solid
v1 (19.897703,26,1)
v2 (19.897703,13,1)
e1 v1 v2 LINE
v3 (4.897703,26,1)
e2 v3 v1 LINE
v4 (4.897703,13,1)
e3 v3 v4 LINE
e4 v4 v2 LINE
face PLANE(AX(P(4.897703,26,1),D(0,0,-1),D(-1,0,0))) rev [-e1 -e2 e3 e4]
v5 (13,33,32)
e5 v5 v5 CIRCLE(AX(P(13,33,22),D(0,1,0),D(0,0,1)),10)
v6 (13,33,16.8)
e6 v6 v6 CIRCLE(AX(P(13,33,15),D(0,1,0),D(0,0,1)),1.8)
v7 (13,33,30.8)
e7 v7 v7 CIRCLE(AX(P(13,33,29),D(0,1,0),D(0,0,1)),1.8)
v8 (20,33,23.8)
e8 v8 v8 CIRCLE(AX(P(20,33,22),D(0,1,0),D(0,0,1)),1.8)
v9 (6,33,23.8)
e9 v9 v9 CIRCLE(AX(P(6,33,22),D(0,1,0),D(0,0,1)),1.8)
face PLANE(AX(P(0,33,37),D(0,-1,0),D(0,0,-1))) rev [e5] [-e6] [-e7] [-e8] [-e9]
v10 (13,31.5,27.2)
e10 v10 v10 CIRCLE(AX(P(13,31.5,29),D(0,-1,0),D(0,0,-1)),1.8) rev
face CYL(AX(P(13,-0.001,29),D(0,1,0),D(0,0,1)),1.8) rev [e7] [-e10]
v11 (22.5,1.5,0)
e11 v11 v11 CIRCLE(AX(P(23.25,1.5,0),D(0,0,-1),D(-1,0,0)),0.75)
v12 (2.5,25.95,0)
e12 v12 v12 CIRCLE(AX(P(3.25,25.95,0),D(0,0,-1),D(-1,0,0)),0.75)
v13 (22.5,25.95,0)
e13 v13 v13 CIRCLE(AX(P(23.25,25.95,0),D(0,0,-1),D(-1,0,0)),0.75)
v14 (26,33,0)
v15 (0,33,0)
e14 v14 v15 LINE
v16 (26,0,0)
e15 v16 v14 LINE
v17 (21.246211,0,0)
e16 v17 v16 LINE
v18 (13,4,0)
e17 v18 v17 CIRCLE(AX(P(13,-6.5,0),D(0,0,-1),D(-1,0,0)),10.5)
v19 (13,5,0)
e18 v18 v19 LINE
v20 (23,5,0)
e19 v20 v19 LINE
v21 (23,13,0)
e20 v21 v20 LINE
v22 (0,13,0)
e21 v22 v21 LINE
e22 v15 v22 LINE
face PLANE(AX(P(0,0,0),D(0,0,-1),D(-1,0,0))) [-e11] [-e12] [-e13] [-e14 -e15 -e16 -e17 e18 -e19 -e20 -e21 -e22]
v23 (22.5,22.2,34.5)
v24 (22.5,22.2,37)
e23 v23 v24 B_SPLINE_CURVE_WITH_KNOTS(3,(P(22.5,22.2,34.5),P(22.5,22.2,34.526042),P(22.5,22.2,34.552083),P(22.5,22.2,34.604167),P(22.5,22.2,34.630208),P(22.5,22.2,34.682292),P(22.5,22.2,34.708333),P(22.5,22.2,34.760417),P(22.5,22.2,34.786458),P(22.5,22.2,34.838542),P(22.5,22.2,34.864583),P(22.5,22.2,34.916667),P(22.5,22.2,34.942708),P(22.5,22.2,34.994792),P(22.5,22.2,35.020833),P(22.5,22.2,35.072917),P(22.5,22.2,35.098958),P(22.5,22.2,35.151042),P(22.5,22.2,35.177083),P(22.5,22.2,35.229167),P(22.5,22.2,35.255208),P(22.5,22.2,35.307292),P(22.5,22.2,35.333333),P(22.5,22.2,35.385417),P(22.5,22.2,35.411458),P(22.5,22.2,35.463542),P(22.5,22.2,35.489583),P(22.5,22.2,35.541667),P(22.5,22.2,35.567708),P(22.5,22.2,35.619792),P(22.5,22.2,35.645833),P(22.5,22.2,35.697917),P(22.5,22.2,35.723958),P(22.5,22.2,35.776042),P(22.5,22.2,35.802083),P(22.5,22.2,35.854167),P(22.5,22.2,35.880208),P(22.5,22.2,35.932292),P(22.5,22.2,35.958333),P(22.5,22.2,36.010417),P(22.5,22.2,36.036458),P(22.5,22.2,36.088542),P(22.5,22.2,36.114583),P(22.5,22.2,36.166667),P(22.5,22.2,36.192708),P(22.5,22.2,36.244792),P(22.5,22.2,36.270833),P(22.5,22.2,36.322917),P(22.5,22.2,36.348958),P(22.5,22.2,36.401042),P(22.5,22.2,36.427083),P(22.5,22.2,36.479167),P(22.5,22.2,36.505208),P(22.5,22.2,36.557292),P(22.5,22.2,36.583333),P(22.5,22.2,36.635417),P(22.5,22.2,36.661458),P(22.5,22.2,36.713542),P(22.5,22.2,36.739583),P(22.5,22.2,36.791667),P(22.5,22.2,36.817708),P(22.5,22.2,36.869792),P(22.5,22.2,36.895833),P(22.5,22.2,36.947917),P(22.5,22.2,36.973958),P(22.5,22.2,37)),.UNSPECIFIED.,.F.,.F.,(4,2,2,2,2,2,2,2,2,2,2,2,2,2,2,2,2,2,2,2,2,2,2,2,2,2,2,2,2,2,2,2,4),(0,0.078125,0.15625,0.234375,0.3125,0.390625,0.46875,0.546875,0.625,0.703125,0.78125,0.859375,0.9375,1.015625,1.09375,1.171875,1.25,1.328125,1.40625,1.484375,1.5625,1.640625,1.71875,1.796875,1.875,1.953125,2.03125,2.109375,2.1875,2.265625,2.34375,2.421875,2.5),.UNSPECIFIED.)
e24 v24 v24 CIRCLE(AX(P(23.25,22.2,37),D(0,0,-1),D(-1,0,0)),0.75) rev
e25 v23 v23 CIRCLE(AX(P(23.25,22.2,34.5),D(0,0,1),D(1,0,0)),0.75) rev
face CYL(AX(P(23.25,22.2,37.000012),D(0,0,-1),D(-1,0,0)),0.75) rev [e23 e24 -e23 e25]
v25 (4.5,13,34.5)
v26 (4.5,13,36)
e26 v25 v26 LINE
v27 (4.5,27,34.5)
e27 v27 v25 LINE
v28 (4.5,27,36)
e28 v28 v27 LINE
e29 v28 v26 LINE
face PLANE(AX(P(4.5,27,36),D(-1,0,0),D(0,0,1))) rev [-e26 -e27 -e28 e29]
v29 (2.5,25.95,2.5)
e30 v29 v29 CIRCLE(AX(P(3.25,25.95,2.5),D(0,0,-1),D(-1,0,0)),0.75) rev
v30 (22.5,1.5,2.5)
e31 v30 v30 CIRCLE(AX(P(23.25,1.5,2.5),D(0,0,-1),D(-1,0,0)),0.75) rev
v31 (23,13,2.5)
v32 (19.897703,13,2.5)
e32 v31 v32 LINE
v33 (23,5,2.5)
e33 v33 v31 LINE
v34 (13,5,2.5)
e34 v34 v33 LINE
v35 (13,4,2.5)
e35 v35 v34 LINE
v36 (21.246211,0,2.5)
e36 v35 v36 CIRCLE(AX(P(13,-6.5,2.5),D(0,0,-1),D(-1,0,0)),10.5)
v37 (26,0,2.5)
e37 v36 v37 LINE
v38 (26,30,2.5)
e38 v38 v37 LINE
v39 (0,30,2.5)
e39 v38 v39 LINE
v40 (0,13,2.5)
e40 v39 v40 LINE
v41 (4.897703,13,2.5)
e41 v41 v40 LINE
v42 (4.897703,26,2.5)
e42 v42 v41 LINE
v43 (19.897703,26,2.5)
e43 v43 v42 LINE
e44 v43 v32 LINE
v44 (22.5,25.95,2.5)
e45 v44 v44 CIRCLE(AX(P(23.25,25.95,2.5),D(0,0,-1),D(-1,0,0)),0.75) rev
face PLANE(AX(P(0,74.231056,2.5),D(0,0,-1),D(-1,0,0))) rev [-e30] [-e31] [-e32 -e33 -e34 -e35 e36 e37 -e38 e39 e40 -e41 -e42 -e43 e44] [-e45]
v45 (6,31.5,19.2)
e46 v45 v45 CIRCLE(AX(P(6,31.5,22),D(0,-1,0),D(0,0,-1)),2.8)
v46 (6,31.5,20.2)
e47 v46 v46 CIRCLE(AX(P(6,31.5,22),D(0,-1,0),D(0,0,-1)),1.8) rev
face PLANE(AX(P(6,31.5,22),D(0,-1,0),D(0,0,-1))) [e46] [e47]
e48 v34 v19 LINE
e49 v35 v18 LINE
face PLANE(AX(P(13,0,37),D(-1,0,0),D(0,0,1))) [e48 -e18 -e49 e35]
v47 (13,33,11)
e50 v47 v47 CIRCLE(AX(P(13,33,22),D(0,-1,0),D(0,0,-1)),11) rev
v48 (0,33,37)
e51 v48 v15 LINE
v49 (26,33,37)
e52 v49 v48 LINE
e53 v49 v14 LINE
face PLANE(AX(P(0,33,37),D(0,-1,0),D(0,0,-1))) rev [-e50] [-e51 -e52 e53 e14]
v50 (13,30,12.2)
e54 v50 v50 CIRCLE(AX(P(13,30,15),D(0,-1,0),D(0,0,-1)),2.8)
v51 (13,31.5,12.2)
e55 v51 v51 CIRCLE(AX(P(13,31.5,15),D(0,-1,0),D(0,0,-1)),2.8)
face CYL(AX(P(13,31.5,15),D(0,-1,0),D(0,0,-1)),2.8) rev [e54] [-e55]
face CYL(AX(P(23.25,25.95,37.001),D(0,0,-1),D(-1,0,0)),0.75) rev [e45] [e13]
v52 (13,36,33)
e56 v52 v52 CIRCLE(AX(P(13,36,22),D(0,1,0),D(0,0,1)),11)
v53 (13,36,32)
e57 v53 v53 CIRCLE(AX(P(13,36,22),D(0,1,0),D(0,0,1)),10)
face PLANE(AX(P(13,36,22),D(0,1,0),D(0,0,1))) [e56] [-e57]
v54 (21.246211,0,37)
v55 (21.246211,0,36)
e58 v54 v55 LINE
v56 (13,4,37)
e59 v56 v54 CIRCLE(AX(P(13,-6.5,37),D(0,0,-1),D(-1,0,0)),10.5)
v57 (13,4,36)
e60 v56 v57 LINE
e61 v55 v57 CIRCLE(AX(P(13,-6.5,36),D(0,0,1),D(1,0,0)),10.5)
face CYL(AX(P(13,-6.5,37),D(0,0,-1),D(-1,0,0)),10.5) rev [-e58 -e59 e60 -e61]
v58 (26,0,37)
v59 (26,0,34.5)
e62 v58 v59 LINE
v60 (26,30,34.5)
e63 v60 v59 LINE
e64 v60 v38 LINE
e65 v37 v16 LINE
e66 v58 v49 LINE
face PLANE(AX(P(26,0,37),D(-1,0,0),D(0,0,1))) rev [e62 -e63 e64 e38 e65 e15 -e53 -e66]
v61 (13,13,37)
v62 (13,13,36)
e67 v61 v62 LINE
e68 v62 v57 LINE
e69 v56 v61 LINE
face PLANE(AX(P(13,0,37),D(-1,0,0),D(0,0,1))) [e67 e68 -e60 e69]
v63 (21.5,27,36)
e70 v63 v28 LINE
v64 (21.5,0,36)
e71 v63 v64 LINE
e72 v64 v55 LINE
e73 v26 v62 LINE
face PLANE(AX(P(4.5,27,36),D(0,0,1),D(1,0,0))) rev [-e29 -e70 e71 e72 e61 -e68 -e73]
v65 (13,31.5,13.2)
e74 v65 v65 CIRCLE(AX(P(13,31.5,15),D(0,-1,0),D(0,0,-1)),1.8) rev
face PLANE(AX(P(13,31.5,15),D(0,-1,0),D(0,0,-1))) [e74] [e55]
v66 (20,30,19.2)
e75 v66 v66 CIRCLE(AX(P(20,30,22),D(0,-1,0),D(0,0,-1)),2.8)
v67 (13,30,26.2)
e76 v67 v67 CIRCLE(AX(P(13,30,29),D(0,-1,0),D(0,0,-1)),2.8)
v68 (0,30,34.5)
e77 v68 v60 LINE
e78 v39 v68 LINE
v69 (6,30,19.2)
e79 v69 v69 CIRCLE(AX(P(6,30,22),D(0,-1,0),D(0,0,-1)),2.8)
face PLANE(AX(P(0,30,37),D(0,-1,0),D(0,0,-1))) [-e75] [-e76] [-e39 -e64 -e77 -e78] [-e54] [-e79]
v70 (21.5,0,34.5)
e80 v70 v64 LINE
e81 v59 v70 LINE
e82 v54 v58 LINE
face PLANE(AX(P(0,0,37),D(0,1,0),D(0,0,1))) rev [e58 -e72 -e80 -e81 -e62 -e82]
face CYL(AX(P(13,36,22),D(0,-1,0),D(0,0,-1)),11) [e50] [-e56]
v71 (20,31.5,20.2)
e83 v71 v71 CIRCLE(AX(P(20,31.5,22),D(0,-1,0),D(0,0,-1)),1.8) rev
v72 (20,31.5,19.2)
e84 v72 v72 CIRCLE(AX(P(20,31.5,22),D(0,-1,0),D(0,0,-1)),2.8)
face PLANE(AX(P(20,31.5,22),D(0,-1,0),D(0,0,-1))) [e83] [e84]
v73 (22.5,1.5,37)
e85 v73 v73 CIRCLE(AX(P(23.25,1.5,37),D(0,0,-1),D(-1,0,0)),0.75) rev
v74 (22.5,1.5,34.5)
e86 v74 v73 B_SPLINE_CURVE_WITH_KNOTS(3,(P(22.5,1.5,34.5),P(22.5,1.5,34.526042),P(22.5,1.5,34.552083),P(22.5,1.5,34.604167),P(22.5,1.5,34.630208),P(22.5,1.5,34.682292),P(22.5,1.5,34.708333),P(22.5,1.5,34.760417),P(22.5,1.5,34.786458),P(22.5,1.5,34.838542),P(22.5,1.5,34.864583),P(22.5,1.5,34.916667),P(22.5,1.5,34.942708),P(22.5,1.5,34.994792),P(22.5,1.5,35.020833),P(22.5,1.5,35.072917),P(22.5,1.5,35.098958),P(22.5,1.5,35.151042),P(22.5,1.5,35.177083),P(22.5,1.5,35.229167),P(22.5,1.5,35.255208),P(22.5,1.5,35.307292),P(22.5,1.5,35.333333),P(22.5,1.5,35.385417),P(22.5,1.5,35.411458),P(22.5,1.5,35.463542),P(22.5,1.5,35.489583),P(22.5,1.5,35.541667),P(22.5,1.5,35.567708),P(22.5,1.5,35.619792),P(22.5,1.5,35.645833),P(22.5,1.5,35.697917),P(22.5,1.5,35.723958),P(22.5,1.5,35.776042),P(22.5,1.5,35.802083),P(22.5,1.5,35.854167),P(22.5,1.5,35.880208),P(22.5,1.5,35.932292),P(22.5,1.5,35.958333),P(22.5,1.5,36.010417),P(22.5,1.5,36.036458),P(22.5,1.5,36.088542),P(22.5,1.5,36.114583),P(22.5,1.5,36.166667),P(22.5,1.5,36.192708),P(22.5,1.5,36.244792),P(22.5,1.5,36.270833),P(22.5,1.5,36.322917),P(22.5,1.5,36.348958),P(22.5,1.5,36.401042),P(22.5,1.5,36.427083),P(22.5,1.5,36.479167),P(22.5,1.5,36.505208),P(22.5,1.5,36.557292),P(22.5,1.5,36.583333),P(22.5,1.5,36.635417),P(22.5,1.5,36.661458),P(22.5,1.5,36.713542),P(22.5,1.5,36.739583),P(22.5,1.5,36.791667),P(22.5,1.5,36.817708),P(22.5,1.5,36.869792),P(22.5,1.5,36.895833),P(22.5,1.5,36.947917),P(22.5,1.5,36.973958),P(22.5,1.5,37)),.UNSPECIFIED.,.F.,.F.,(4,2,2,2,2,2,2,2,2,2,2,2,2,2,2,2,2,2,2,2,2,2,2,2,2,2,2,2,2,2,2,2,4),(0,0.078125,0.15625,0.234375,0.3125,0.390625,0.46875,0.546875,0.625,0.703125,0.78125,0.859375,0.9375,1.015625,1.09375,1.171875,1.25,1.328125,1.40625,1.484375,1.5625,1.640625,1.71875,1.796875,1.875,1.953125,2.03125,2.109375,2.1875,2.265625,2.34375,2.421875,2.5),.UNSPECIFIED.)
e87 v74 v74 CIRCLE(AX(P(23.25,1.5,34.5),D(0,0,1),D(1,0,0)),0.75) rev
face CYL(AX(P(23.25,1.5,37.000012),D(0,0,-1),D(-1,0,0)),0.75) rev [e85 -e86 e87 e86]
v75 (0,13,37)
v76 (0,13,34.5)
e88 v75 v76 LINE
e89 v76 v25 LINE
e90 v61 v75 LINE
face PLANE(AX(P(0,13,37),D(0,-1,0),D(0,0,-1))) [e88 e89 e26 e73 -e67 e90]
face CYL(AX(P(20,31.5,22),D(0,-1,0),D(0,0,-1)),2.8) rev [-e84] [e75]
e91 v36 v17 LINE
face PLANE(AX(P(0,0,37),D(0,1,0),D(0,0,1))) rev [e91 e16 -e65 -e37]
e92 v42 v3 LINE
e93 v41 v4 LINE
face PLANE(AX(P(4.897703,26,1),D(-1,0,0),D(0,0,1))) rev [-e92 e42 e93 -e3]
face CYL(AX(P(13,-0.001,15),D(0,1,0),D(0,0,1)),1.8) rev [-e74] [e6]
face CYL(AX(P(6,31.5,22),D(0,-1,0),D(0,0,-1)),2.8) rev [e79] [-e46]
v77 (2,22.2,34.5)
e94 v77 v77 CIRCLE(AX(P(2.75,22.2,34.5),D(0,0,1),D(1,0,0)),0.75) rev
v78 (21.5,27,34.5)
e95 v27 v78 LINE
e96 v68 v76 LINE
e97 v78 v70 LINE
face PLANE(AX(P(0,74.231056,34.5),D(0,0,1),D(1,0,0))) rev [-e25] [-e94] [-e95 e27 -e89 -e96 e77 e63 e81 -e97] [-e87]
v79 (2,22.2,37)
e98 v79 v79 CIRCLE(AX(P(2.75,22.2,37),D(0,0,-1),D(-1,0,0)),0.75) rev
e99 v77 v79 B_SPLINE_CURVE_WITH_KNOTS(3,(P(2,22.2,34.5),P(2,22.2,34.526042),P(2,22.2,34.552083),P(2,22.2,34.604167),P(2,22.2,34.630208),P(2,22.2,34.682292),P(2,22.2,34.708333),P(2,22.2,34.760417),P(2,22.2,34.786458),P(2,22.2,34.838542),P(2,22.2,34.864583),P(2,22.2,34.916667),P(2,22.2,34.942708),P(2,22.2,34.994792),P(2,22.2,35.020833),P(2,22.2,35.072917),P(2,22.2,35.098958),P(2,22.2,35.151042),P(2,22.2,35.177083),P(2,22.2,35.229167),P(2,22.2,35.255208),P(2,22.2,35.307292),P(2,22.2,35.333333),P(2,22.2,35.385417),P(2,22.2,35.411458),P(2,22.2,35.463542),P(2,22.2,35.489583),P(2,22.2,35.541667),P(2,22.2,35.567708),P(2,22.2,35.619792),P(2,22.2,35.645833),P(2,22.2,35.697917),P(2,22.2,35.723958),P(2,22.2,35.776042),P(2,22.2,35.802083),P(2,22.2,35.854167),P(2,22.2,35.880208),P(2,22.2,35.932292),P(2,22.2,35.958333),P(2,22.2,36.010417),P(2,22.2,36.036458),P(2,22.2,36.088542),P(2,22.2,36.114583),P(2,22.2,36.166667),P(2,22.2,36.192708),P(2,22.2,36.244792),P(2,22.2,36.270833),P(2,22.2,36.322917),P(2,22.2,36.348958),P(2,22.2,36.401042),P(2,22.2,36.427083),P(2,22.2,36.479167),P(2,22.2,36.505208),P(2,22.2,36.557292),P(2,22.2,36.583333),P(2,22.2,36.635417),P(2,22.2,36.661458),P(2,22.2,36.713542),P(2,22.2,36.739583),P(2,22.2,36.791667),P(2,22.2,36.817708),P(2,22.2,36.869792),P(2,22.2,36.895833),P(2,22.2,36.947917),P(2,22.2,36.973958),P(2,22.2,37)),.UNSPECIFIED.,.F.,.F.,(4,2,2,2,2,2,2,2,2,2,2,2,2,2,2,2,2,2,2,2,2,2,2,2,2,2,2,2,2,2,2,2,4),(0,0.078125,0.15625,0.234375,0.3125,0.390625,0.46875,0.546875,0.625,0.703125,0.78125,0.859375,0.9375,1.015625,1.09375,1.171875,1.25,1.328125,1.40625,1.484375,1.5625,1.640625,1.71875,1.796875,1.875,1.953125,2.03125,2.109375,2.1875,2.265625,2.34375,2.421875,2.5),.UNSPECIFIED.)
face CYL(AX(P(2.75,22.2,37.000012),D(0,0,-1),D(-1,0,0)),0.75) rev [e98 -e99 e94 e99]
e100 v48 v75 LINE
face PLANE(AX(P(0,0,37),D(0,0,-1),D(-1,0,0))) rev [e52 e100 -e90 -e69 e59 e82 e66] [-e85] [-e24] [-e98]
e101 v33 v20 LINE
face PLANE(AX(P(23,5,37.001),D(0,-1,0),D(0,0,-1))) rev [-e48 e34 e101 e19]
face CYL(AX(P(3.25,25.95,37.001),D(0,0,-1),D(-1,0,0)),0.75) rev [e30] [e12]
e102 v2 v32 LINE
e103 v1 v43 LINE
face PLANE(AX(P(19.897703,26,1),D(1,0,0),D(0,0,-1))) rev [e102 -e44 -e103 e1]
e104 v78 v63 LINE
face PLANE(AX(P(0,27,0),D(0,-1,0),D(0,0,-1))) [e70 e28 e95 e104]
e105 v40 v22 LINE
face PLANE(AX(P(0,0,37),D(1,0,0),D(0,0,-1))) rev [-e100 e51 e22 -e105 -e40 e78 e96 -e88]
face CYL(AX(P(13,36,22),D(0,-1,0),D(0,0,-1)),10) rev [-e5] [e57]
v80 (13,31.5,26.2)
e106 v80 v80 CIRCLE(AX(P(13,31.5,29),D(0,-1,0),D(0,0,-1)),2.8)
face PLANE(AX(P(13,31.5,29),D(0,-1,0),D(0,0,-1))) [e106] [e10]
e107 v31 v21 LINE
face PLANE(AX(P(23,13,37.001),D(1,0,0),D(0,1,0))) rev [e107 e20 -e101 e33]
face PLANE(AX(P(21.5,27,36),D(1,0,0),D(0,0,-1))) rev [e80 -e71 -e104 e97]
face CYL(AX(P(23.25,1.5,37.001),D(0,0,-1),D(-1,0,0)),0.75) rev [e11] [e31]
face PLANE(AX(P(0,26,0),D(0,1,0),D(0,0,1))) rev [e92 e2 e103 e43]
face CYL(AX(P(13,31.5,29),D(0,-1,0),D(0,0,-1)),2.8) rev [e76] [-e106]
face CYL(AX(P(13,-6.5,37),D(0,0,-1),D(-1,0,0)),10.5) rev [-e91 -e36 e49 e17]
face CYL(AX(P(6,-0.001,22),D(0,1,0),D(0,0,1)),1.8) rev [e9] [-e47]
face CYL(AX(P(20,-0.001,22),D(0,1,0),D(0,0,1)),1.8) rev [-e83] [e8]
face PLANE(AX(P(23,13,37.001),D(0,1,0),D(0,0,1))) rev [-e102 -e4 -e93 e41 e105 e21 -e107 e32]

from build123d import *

# Parameters (mm, degrees)
SKETCH_1_W                      = 26
SKETCH_1_H                      = 33
EXTRUDE_1_DEPTH                 = 37
SKETCH_3_W                      = 26
SKETCH_3_H                      = 32
CUT_EXTRUDE_1_DEPTH             = 30
CUT_EXTRUDE_2_REACH             = 57.982
SKETCH_2_R                      = 0.75
CUT_EXTRUDE_2_DIRECTION_2_DEPTH = 56.982140009
CUT_EXTRUDE_3_REACH             = 57.982
SKETCH_4_R                      = 0.75
SKETCH_5_W                      = 17
SKETCH_5_H                      = 1.5
CUT_EXTRUDE_4_DEPTH             = 27
CUT_EXTRUDE_5_REACH             = 57.982
SKETCH_6_W                      = 20
SKETCH_6_H                      = 8
CUT_EXTRUDE_START               = -37
CUT_EXTRUDE_6_OUTLINE_R         = 0.75
CUT_EXTRUDE_6_DEPTH             = 37
SKETCH_8_W                      = 15
SKETCH_8_H                      = 1.5
CUT_EXTRUDE_7_DEPTH             = 13
SKETCH_9_R                      = 11
SKETCH_9_R_2                    = 10
EXTRUDE_2_DEPTH                 = 3
CUT_EXTRUDE_8_REACH             = 57.982
SKETCH_10_R                     = 1.8
SKETCH_11_R                     = 2.8
CUT_EXTRUDE_9_DEPTH             = 1.5


# Read off the part's stored shape, not the designer's step: 切除-拉伸6
with BuildPart() as part:
    # 草图1 → 凸台-拉伸1 (new body)
    with BuildSketch(Plane.XY):
        with Locations((13, 16.5)):
            Rectangle(SKETCH_1_W, SKETCH_1_H)
    extrude(amount=EXTRUDE_1_DEPTH)

    # 草图3 → 切除-拉伸1 (cut)
    with BuildSketch(Plane.XZ):
        with Locations((13, 18.5)):
            Rectangle(SKETCH_3_W, SKETCH_3_H)
    extrude(amount=-CUT_EXTRUDE_1_DEPTH, mode=Mode.SUBTRACT)

    # 草图2 → 切除-拉伸2 (cut, up to next)
    with BuildSketch(Plane.XY.offset(37), mode=Mode.PRIVATE) as cut_extrude_2_sk1:
        with Locations(Location((2.75, 1.5, 0), (0, 0, 180))):
            Circle(SKETCH_2_R)
    cut_extrude_2_tool1 = extrude(cut_extrude_2_sk1.sketch, amount=-CUT_EXTRUDE_2_REACH, mode=Mode.PRIVATE) & part.part
    # 草图2 → 切除-拉伸2 (cut, up to next)
    with BuildSketch(Plane.XY.offset(37), mode=Mode.PRIVATE) as cut_extrude_2_sk2:
        with Locations(Location((23.25, 1.5, 0), (0, 0, 180))):
            Circle(SKETCH_2_R)
    cut_extrude_2_tool2 = extrude(cut_extrude_2_sk2.sketch, amount=-CUT_EXTRUDE_2_REACH, mode=Mode.PRIVATE) & part.part
    # 草图2 → 切除-拉伸2 (cut, up to next)
    with BuildSketch(Plane.XY.offset(37), mode=Mode.PRIVATE) as cut_extrude_2_sk3:
        with Locations(Location((23.25, 22.2, 0), (0, 0, 180))):
            Circle(SKETCH_2_R)
    cut_extrude_2_tool3 = extrude(cut_extrude_2_sk3.sketch, amount=-CUT_EXTRUDE_2_REACH, mode=Mode.PRIVATE) & part.part
    # 草图2 → 切除-拉伸2 (cut, up to next)
    with BuildSketch(Plane.XY.offset(37), mode=Mode.PRIVATE) as cut_extrude_2_sk4:
        with Locations(Location((2.75, 22.2, 0), (0, 0, 180))):
            Circle(SKETCH_2_R)
    cut_extrude_2_tool4 = extrude(cut_extrude_2_sk4.sketch, amount=-CUT_EXTRUDE_2_REACH, mode=Mode.PRIVATE) & part.part
    add(cut_extrude_2_tool1.solids().sort_by_distance((2.75, 1.5, 37))[0], mode=Mode.SUBTRACT)
    add(cut_extrude_2_tool2.solids().sort_by_distance((23.25, 1.5, 37))[0], mode=Mode.SUBTRACT)
    add(cut_extrude_2_tool3.solids().sort_by_distance((23.25, 22.2, 37))[0], mode=Mode.SUBTRACT)
    add(cut_extrude_2_tool4.solids().sort_by_distance((2.75, 22.2, 37))[0], mode=Mode.SUBTRACT)

    # 草图2 → 切除-拉伸2 direction 2 (cut)
    with BuildSketch(Plane.XY.offset(37)):
        with Locations(Location((2.75, 1.5, 0), (0, 0, 180))):
            Circle(SKETCH_2_R)
        with Locations(Location((23.25, 1.5, 0), (0, 0, 180))):
            Circle(SKETCH_2_R)
        with Locations(Location((23.25, 22.2, 0), (0, 0, 180))):
            Circle(SKETCH_2_R)
        with Locations(Location((2.75, 22.2, 0), (0, 0, 180))):
            Circle(SKETCH_2_R)
    extrude(amount=CUT_EXTRUDE_2_DIRECTION_2_DEPTH, mode=Mode.SUBTRACT)

    # 草图4 → 切除-拉伸3 (cut, up to next)
    with BuildSketch(Plane(origin=(0, 0, 0), x_dir=(-1, 0, 0), z_dir=(0, 0, -1)), mode=Mode.PRIVATE) as cut_extrude_3_sk1:
        with Locations((-2.75, 1.5)):
            Circle(SKETCH_4_R)
    cut_extrude_3_tool1 = extrude(cut_extrude_3_sk1.sketch, amount=-CUT_EXTRUDE_3_REACH, mode=Mode.PRIVATE) & part.part
    # 草图4 → 切除-拉伸3 (cut, up to next)
    with BuildSketch(Plane(origin=(0, 0, 0), x_dir=(-1, 0, 0), z_dir=(0, 0, -1)), mode=Mode.PRIVATE) as cut_extrude_3_sk2:
        with Locations((-23.25, 1.5)):
            Circle(SKETCH_4_R)
    cut_extrude_3_tool2 = extrude(cut_extrude_3_sk2.sketch, amount=-CUT_EXTRUDE_3_REACH, mode=Mode.PRIVATE) & part.part
    # 草图4 → 切除-拉伸3 (cut, up to next)
    with BuildSketch(Plane(origin=(0, 0, 0), x_dir=(-1, 0, 0), z_dir=(0, 0, -1)), mode=Mode.PRIVATE) as cut_extrude_3_sk3:
        with Locations((-23.25, 25.95)):
            Circle(SKETCH_4_R)
    cut_extrude_3_tool3 = extrude(cut_extrude_3_sk3.sketch, amount=-CUT_EXTRUDE_3_REACH, mode=Mode.PRIVATE) & part.part
    # 草图4 → 切除-拉伸3 (cut, up to next)
    with BuildSketch(Plane(origin=(0, 0, 0), x_dir=(-1, 0, 0), z_dir=(0, 0, -1)), mode=Mode.PRIVATE) as cut_extrude_3_sk4:
        with Locations((-3.25, 25.95)):
            Circle(SKETCH_4_R)
    cut_extrude_3_tool4 = extrude(cut_extrude_3_sk4.sketch, amount=-CUT_EXTRUDE_3_REACH, mode=Mode.PRIVATE) & part.part
    add(cut_extrude_3_tool1.solids().sort_by_distance((2.75, 1.5, 0))[0], mode=Mode.SUBTRACT)
    add(cut_extrude_3_tool2.solids().sort_by_distance((23.25, 1.5, 0))[0], mode=Mode.SUBTRACT)
    add(cut_extrude_3_tool3.solids().sort_by_distance((23.25, 25.95, 0))[0], mode=Mode.SUBTRACT)
    add(cut_extrude_3_tool4.solids().sort_by_distance((3.25, 25.95, 0))[0], mode=Mode.SUBTRACT)

    # 草图5 → 切除-拉伸4 (cut)
    with BuildSketch(Plane.XZ):
        with Locations((13, 35.25)):
            Rectangle(SKETCH_5_W, SKETCH_5_H)
    extrude(amount=-CUT_EXTRUDE_4_DEPTH, mode=Mode.SUBTRACT)

    # 草图6 → 切除-拉伸5 (cut, up to next)
    with BuildSketch(Plane(origin=(0, 0, 0), x_dir=(-1, 0, 0), z_dir=(0, 0, -1)), mode=Mode.PRIVATE) as cut_extrude_5_sk1:
        with Locations((-13, 9)):
            Rectangle(SKETCH_6_W, SKETCH_6_H)
    cut_extrude_5_tool1 = extrude(cut_extrude_5_sk1.sketch, amount=-CUT_EXTRUDE_5_REACH, mode=Mode.PRIVATE) & part.part
    add(cut_extrude_5_tool1.solids().sort_by_distance((13, 9, 0))[0], mode=Mode.SUBTRACT)

    # 切除-拉伸6 outline → 切除-拉伸6 (cut)
    with BuildSketch(Plane(origin=(0, 0, 0), x_dir=(-1, 0, 0), z_dir=(0, 0, -1)).offset(CUT_EXTRUDE_START)):
        with BuildLine():
            Line((0, 0), (0, 13))
            Line((0, 13), (-13, 13))
            Line((-13, 13), (-13, 4))
            ThreePointArc((-13, 4), (-17.582575695, 2.947221814), (-21.246211251, 0))
            Line((-21.246211251, 0), (0, 0))
        make_face()
        with Locations((-2.75, 1.5)):
            Circle(CUT_EXTRUDE_6_OUTLINE_R, mode=Mode.SUBTRACT)
    extrude(amount=CUT_EXTRUDE_6_DEPTH, mode=Mode.SUBTRACT)

    # 草图8 → 切除-拉伸7 (cut)
    with BuildSketch(Plane.XZ.offset(-13)):
        with Locations((12.397702636, 1.75)):
            Rectangle(SKETCH_8_W, SKETCH_8_H)
    extrude(amount=-CUT_EXTRUDE_7_DEPTH, mode=Mode.SUBTRACT)

    # 草图9 → 凸台-拉伸2 (add)
    with BuildSketch(Plane(origin=(0, 33, 0), x_dir=(1, 0, 0), z_dir=(0, 1, 0))):
        with Locations(Location((13, -22, 0), (0, 0, 90))):
            Circle(SKETCH_9_R)
        with Locations(Location((13, -22, 0), (0, 0, 270))):
            Circle(SKETCH_9_R_2, mode=Mode.SUBTRACT)
    extrude(amount=EXTRUDE_2_DEPTH)

    # 草图10 → 切除-拉伸8 (cut, up to next)
    with BuildSketch(Plane(origin=(0, 33, 0), x_dir=(1, 0, 0), z_dir=(0, 1, 0)), mode=Mode.PRIVATE) as cut_extrude_8_sk1:
        with Locations(Location((13, -15, 0), (0, 0, 270))):
            Circle(SKETCH_10_R)
    cut_extrude_8_tool1 = extrude(cut_extrude_8_sk1.sketch, amount=-CUT_EXTRUDE_8_REACH, mode=Mode.PRIVATE) & part.part
    # 草图10 → 切除-拉伸8 (cut, up to next)
    with BuildSketch(Plane(origin=(0, 33, 0), x_dir=(1, 0, 0), z_dir=(0, 1, 0)), mode=Mode.PRIVATE) as cut_extrude_8_sk2:
        with Locations(Location((20, -22, 0), (0, 0, 270))):
            Circle(SKETCH_10_R)
    cut_extrude_8_tool2 = extrude(cut_extrude_8_sk2.sketch, amount=-CUT_EXTRUDE_8_REACH, mode=Mode.PRIVATE) & part.part
    # 草图10 → 切除-拉伸8 (cut, up to next)
    with BuildSketch(Plane(origin=(0, 33, 0), x_dir=(1, 0, 0), z_dir=(0, 1, 0)), mode=Mode.PRIVATE) as cut_extrude_8_sk3:
        with Locations(Location((13, -29, 0), (0, 0, 270))):
            Circle(SKETCH_10_R)
    cut_extrude_8_tool3 = extrude(cut_extrude_8_sk3.sketch, amount=-CUT_EXTRUDE_8_REACH, mode=Mode.PRIVATE) & part.part
    # 草图10 → 切除-拉伸8 (cut, up to next)
    with BuildSketch(Plane(origin=(0, 33, 0), x_dir=(1, 0, 0), z_dir=(0, 1, 0)), mode=Mode.PRIVATE) as cut_extrude_8_sk4:
        with Locations(Location((6, -22, 0), (0, 0, 270))):
            Circle(SKETCH_10_R)
    cut_extrude_8_tool4 = extrude(cut_extrude_8_sk4.sketch, amount=-CUT_EXTRUDE_8_REACH, mode=Mode.PRIVATE) & part.part
    add(cut_extrude_8_tool1.solids().sort_by_distance((13, 33, 15))[0], mode=Mode.SUBTRACT)
    add(cut_extrude_8_tool2.solids().sort_by_distance((20, 33, 22))[0], mode=Mode.SUBTRACT)
    add(cut_extrude_8_tool3.solids().sort_by_distance((13, 33, 29))[0], mode=Mode.SUBTRACT)
    add(cut_extrude_8_tool4.solids().sort_by_distance((6, 33, 22))[0], mode=Mode.SUBTRACT)

    # 草图11 → 切除-拉伸9 (cut)
    with BuildSketch(Plane.XZ.offset(-30)):
        with Locations(Location((6, 22, 0), (0, 0, 270))):
            Circle(SKETCH_11_R)
        with Locations(Location((13, 29, 0), (0, 0, 270))):
            Circle(SKETCH_11_R)
        with Locations(Location((20, 22, 0), (0, 0, 270))):
            Circle(SKETCH_11_R)
        with Locations(Location((13, 15, 0), (0, 0, 270))):
            Circle(SKETCH_11_R)
    extrude(amount=-CUT_EXTRUDE_9_DEPTH, mode=Mode.SUBTRACT)


solid = part.part
